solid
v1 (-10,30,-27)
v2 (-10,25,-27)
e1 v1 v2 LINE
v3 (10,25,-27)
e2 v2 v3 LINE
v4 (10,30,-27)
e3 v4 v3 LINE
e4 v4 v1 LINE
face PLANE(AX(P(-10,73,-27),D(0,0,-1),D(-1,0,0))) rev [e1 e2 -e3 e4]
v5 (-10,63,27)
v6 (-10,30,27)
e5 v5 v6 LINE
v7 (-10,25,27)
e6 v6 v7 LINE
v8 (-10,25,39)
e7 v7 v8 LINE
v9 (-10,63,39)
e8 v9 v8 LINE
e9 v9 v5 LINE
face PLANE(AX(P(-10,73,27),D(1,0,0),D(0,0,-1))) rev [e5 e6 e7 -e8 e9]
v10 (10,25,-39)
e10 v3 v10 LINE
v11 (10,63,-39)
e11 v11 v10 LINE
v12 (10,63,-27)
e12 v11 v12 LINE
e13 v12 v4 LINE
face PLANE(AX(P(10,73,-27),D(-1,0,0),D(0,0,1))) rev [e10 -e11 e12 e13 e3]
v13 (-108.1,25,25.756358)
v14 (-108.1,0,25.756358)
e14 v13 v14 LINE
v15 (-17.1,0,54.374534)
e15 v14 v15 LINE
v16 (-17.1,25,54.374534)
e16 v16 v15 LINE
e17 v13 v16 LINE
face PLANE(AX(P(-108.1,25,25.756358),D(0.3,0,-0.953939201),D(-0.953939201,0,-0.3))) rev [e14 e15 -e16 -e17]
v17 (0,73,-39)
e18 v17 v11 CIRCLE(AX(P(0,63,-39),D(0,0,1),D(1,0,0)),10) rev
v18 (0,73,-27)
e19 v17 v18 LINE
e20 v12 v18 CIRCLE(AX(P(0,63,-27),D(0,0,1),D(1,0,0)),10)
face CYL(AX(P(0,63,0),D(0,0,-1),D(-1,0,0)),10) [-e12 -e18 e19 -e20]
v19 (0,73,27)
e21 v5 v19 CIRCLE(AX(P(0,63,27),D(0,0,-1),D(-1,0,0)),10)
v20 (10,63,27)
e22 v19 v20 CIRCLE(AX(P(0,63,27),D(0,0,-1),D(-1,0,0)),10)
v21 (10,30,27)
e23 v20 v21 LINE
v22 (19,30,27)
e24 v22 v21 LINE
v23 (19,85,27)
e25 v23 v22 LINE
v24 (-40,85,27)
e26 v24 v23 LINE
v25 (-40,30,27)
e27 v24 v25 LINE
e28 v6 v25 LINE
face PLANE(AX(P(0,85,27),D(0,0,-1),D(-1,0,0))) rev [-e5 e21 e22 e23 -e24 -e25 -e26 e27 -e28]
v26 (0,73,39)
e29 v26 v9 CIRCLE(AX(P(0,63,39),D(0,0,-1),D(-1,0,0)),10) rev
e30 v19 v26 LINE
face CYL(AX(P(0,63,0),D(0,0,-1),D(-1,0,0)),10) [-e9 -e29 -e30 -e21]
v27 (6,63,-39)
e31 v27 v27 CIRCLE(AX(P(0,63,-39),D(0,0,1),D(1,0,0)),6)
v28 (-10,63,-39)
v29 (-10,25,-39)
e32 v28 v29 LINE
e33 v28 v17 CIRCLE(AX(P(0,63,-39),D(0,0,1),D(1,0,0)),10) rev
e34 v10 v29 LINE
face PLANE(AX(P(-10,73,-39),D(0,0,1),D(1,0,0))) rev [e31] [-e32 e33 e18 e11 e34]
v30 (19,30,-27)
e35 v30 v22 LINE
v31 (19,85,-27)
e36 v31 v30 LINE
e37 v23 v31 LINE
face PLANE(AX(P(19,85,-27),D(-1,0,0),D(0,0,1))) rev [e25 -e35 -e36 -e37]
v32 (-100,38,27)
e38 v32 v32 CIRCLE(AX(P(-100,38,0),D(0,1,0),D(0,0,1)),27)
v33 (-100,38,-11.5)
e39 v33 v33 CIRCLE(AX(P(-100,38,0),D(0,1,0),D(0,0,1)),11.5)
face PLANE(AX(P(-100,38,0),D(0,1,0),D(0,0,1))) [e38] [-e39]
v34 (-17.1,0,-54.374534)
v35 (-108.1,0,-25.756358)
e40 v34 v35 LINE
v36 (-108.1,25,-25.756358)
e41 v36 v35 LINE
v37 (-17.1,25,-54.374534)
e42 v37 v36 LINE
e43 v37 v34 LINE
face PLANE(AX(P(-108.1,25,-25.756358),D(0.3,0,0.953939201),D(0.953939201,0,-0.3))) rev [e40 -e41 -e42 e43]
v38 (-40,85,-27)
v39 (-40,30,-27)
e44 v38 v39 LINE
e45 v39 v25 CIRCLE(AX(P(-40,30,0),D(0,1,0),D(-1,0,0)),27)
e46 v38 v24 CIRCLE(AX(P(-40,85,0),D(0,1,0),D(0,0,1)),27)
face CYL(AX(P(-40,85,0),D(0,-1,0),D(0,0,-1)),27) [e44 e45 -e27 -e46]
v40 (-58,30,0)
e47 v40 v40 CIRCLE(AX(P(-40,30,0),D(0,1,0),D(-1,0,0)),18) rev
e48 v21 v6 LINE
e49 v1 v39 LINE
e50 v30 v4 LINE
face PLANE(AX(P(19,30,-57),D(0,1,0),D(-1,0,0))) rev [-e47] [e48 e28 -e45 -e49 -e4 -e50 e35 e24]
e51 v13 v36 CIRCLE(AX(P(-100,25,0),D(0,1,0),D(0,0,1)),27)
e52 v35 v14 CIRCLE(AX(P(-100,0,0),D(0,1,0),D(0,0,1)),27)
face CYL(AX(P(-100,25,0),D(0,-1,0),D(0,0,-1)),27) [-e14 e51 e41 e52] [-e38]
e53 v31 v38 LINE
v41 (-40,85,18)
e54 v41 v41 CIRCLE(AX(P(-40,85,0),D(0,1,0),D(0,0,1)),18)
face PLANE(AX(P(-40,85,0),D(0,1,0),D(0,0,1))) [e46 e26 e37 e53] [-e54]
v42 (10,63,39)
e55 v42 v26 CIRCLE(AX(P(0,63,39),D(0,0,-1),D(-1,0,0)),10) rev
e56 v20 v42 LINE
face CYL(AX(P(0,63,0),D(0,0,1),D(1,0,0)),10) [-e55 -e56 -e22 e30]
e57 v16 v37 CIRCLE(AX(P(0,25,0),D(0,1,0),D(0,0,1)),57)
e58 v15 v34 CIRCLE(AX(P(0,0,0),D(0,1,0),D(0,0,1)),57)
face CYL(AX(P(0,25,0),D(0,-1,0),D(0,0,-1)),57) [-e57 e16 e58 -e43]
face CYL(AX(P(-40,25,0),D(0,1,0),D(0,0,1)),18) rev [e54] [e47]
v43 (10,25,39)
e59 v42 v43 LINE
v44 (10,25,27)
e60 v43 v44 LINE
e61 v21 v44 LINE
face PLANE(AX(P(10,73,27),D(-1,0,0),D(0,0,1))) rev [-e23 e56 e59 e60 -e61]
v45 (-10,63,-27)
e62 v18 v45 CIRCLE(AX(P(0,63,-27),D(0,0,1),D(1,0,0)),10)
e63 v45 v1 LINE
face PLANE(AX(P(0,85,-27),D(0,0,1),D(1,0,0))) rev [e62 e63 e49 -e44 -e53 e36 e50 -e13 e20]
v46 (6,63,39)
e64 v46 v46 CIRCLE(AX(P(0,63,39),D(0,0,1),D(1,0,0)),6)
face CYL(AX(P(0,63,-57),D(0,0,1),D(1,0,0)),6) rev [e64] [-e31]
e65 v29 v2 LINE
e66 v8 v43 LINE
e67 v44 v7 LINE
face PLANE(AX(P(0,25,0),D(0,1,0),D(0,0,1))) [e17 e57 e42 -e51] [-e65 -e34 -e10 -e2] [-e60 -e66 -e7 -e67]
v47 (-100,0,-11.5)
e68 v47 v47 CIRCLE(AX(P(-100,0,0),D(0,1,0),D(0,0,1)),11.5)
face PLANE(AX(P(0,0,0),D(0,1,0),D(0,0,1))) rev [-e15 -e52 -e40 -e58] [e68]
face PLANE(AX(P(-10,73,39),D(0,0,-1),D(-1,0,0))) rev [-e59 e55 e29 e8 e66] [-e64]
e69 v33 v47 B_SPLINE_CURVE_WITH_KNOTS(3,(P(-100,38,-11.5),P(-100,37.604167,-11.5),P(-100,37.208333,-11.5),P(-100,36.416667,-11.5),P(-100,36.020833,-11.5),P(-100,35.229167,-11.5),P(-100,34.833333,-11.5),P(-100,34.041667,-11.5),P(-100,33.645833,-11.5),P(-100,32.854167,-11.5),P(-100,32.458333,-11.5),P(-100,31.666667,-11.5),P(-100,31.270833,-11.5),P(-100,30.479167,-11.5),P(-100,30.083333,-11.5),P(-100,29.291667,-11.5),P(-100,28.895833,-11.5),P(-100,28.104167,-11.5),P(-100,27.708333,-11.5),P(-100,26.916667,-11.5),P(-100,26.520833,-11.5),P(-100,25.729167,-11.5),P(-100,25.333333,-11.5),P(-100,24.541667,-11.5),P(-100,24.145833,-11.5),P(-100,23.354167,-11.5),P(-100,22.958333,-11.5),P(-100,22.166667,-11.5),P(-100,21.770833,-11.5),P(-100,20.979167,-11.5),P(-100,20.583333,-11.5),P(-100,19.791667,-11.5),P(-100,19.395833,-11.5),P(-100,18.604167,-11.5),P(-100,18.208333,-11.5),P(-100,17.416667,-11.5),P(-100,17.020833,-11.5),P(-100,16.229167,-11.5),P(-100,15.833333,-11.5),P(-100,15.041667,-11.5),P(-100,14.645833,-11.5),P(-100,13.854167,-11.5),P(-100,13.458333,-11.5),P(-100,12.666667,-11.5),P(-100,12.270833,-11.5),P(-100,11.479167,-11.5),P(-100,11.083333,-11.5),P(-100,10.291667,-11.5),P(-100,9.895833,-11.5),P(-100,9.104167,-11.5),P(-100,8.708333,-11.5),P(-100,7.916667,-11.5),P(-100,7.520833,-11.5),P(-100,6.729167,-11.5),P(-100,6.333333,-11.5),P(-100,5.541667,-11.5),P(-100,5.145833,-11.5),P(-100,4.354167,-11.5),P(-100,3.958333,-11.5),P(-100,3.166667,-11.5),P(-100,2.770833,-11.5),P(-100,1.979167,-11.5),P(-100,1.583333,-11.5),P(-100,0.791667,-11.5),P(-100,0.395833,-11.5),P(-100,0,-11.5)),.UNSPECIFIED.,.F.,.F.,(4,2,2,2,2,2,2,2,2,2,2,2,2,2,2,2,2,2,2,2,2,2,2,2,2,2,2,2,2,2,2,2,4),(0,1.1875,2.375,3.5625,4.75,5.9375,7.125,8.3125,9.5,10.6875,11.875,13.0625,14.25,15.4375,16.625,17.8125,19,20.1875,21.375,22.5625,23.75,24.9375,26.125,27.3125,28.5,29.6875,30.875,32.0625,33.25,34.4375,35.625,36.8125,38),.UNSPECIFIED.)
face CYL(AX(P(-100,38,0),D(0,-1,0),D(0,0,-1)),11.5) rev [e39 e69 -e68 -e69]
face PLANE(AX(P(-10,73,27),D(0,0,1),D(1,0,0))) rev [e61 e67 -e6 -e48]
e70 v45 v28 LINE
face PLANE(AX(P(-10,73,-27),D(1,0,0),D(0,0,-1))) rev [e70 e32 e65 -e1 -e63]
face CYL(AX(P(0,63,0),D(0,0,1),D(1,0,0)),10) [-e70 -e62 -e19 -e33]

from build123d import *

# Parameters (mm, degrees)
BASE_DEPTH                 = 25
SKETCH2_R                  = 27
SKETCH2_R_2                = 11.5
FRONT_THRU_BORDER_DEPTH    = 13
SKETCH4_R                  = 11.5
FRONT_THRU_HOLE_DEPTH      = 142.431962441
TOP_FEATURE_DEPTH          = 60
SKETCH6_R                  = 18
TOP_FEATURE_HOLE_DEPTH     = 60
SKETCH7_W                  = 90
SKETCH7_H                  = 5
TOP_FEATURE_GAP_DEPTH      = 175.38463235
SKETCH8_W                  = 20
SKETCH8_H                  = 12
TOP_FEATURE_ARM_DEPTH      = 48
FILLET2_R                  = 10
SKETCH10_R                 = 6
TOP_FEATURE_ARM_HOLE_DEPTH = 181.471604415


with BuildPart() as part:
    # Sketch1 → base (new body)
    with BuildSketch(Plane(origin=(0, 0, 0), x_dir=(1, 0, 0), z_dir=(0, 1, 0))):
        with BuildLine():
            Line((-108.1, -25.756358438), (-17.1, -54.374534481))
            ThreePointArc((-17.1, -54.374534481), (57, 0), (-17.1, 54.374534481))
            Line((-17.1, 54.374534481), (-108.1, 25.756358438))
            ThreePointArc((-108.1, 25.756358438), (-127, 0), (-108.1, -25.756358438))
        make_face()
    extrude(amount=BASE_DEPTH)

    # Sketch2 → front thru border (add)
    with BuildSketch(Plane(origin=(0, 25, 0), x_dir=(1, 0, 0), z_dir=(0, 1, 0))):
        with Locations(Location((-100, 0, 0), (0, 0, 107.457603124))):
            Circle(SKETCH2_R)
        with Locations(Location((-100, 0, 0), (0, 0, 90))):
            Circle(SKETCH2_R_2, mode=Mode.SUBTRACT)
    extrude(amount=FRONT_THRU_BORDER_DEPTH)

    # Sketch4 → front thru hole (cut, through all)
    with BuildSketch(Plane(origin=(0, 25, 0), x_dir=(1, 0, 0), z_dir=(0, 1, 0))):
        with Locations(Location((-100, 0, 0), (0, 0, 90))):
            Circle(SKETCH4_R)
    extrude(amount=-FRONT_THRU_HOLE_DEPTH, mode=Mode.SUBTRACT)

    # Sketch5 → top feature (add)
    with BuildSketch(Plane(origin=(0, 25, 0), x_dir=(1, 0, 0), z_dir=(0, 1, 0))):
        with BuildLine():
            Line((0, -27), (-40, -27))
            ThreePointArc((-40, -27), (-67, 0), (-40, 27))
            Line((-40, 27), (0, 27))
            Line((0, 27), (19, 27))
            Line((19, 27), (19, -27))
            Line((19, -27), (0, -27))
        make_face()
    extrude(amount=TOP_FEATURE_DEPTH)

    # Sketch6 → top feature hole (cut)
    with BuildSketch(Plane(origin=(0, 85, 0), x_dir=(1, 0, 0), z_dir=(0, 1, 0))):
        with Locations(Location((-40, 0, 0), (0, 0, 270))):
            Circle(SKETCH6_R)
    extrude(amount=-TOP_FEATURE_HOLE_DEPTH, mode=Mode.SUBTRACT)

    # Sketch7 → top feature gap (cut, through all)
    with BuildSketch(Plane.XY.offset(27)):
        with Locations((-26, 27.5)):
            Rectangle(SKETCH7_W, SKETCH7_H)
    extrude(amount=-TOP_FEATURE_GAP_DEPTH, mode=Mode.SUBTRACT)


with BuildPart() as top_feature_gap_piece_1:
    # of the separate pieces the step leaves, piece 1, a body of its own (top_feature_gap_pieces)
    add(part.part.solids().sort_by_distance((-17.1, 0, -54.374534481))[0])



with BuildPart() as top_feature_gap_piece_2:
    # of the separate pieces the step leaves, piece 2, a body of its own (top_feature_gap_pieces)
    add(part.part.solids().sort_by_distance((19, 30, -27))[0])


with BuildPart() as top_feature_gap_piece_1_1:
    add(top_feature_gap_piece_1.part)

    add(top_feature_gap_piece_2.part)  # top feature arm merges top feature gap piece 2
    # Sketch8 → top feature arm (add)
    with BuildSketch(Plane(origin=(0, 25, 0), x_dir=(1, 0, 0), z_dir=(0, 1, 0))):
        with Locations((0, -33)):
            Rectangle(SKETCH8_W, SKETCH8_H)
        with Locations((0, 33)):
            Rectangle(SKETCH8_W, SKETCH8_H)
    extrude(amount=TOP_FEATURE_ARM_DEPTH)

    # Fillet2
    fillet2_edges = [top_feature_gap_piece_1_1.edges().sort_by_distance(p)[0] for p in [
        (10, 73, -33),
        (-10, 73, -33),
        (10, 73, 33),
        (-10, 73, 33),
    ]]
    fillet(fillet2_edges, radius=FILLET2_R - 0.0001)  # a hair under: the kernel refuses the full size

    # Sketch10 → top feature arm hole (cut, through all)
    with BuildSketch(Plane.XY.offset(39)):
        with Locations((0, 63)):
            Circle(SKETCH10_R)
    extrude(amount=-TOP_FEATURE_ARM_HOLE_DEPTH, mode=Mode.SUBTRACT)


solid = top_feature_gap_piece_1_1.part
